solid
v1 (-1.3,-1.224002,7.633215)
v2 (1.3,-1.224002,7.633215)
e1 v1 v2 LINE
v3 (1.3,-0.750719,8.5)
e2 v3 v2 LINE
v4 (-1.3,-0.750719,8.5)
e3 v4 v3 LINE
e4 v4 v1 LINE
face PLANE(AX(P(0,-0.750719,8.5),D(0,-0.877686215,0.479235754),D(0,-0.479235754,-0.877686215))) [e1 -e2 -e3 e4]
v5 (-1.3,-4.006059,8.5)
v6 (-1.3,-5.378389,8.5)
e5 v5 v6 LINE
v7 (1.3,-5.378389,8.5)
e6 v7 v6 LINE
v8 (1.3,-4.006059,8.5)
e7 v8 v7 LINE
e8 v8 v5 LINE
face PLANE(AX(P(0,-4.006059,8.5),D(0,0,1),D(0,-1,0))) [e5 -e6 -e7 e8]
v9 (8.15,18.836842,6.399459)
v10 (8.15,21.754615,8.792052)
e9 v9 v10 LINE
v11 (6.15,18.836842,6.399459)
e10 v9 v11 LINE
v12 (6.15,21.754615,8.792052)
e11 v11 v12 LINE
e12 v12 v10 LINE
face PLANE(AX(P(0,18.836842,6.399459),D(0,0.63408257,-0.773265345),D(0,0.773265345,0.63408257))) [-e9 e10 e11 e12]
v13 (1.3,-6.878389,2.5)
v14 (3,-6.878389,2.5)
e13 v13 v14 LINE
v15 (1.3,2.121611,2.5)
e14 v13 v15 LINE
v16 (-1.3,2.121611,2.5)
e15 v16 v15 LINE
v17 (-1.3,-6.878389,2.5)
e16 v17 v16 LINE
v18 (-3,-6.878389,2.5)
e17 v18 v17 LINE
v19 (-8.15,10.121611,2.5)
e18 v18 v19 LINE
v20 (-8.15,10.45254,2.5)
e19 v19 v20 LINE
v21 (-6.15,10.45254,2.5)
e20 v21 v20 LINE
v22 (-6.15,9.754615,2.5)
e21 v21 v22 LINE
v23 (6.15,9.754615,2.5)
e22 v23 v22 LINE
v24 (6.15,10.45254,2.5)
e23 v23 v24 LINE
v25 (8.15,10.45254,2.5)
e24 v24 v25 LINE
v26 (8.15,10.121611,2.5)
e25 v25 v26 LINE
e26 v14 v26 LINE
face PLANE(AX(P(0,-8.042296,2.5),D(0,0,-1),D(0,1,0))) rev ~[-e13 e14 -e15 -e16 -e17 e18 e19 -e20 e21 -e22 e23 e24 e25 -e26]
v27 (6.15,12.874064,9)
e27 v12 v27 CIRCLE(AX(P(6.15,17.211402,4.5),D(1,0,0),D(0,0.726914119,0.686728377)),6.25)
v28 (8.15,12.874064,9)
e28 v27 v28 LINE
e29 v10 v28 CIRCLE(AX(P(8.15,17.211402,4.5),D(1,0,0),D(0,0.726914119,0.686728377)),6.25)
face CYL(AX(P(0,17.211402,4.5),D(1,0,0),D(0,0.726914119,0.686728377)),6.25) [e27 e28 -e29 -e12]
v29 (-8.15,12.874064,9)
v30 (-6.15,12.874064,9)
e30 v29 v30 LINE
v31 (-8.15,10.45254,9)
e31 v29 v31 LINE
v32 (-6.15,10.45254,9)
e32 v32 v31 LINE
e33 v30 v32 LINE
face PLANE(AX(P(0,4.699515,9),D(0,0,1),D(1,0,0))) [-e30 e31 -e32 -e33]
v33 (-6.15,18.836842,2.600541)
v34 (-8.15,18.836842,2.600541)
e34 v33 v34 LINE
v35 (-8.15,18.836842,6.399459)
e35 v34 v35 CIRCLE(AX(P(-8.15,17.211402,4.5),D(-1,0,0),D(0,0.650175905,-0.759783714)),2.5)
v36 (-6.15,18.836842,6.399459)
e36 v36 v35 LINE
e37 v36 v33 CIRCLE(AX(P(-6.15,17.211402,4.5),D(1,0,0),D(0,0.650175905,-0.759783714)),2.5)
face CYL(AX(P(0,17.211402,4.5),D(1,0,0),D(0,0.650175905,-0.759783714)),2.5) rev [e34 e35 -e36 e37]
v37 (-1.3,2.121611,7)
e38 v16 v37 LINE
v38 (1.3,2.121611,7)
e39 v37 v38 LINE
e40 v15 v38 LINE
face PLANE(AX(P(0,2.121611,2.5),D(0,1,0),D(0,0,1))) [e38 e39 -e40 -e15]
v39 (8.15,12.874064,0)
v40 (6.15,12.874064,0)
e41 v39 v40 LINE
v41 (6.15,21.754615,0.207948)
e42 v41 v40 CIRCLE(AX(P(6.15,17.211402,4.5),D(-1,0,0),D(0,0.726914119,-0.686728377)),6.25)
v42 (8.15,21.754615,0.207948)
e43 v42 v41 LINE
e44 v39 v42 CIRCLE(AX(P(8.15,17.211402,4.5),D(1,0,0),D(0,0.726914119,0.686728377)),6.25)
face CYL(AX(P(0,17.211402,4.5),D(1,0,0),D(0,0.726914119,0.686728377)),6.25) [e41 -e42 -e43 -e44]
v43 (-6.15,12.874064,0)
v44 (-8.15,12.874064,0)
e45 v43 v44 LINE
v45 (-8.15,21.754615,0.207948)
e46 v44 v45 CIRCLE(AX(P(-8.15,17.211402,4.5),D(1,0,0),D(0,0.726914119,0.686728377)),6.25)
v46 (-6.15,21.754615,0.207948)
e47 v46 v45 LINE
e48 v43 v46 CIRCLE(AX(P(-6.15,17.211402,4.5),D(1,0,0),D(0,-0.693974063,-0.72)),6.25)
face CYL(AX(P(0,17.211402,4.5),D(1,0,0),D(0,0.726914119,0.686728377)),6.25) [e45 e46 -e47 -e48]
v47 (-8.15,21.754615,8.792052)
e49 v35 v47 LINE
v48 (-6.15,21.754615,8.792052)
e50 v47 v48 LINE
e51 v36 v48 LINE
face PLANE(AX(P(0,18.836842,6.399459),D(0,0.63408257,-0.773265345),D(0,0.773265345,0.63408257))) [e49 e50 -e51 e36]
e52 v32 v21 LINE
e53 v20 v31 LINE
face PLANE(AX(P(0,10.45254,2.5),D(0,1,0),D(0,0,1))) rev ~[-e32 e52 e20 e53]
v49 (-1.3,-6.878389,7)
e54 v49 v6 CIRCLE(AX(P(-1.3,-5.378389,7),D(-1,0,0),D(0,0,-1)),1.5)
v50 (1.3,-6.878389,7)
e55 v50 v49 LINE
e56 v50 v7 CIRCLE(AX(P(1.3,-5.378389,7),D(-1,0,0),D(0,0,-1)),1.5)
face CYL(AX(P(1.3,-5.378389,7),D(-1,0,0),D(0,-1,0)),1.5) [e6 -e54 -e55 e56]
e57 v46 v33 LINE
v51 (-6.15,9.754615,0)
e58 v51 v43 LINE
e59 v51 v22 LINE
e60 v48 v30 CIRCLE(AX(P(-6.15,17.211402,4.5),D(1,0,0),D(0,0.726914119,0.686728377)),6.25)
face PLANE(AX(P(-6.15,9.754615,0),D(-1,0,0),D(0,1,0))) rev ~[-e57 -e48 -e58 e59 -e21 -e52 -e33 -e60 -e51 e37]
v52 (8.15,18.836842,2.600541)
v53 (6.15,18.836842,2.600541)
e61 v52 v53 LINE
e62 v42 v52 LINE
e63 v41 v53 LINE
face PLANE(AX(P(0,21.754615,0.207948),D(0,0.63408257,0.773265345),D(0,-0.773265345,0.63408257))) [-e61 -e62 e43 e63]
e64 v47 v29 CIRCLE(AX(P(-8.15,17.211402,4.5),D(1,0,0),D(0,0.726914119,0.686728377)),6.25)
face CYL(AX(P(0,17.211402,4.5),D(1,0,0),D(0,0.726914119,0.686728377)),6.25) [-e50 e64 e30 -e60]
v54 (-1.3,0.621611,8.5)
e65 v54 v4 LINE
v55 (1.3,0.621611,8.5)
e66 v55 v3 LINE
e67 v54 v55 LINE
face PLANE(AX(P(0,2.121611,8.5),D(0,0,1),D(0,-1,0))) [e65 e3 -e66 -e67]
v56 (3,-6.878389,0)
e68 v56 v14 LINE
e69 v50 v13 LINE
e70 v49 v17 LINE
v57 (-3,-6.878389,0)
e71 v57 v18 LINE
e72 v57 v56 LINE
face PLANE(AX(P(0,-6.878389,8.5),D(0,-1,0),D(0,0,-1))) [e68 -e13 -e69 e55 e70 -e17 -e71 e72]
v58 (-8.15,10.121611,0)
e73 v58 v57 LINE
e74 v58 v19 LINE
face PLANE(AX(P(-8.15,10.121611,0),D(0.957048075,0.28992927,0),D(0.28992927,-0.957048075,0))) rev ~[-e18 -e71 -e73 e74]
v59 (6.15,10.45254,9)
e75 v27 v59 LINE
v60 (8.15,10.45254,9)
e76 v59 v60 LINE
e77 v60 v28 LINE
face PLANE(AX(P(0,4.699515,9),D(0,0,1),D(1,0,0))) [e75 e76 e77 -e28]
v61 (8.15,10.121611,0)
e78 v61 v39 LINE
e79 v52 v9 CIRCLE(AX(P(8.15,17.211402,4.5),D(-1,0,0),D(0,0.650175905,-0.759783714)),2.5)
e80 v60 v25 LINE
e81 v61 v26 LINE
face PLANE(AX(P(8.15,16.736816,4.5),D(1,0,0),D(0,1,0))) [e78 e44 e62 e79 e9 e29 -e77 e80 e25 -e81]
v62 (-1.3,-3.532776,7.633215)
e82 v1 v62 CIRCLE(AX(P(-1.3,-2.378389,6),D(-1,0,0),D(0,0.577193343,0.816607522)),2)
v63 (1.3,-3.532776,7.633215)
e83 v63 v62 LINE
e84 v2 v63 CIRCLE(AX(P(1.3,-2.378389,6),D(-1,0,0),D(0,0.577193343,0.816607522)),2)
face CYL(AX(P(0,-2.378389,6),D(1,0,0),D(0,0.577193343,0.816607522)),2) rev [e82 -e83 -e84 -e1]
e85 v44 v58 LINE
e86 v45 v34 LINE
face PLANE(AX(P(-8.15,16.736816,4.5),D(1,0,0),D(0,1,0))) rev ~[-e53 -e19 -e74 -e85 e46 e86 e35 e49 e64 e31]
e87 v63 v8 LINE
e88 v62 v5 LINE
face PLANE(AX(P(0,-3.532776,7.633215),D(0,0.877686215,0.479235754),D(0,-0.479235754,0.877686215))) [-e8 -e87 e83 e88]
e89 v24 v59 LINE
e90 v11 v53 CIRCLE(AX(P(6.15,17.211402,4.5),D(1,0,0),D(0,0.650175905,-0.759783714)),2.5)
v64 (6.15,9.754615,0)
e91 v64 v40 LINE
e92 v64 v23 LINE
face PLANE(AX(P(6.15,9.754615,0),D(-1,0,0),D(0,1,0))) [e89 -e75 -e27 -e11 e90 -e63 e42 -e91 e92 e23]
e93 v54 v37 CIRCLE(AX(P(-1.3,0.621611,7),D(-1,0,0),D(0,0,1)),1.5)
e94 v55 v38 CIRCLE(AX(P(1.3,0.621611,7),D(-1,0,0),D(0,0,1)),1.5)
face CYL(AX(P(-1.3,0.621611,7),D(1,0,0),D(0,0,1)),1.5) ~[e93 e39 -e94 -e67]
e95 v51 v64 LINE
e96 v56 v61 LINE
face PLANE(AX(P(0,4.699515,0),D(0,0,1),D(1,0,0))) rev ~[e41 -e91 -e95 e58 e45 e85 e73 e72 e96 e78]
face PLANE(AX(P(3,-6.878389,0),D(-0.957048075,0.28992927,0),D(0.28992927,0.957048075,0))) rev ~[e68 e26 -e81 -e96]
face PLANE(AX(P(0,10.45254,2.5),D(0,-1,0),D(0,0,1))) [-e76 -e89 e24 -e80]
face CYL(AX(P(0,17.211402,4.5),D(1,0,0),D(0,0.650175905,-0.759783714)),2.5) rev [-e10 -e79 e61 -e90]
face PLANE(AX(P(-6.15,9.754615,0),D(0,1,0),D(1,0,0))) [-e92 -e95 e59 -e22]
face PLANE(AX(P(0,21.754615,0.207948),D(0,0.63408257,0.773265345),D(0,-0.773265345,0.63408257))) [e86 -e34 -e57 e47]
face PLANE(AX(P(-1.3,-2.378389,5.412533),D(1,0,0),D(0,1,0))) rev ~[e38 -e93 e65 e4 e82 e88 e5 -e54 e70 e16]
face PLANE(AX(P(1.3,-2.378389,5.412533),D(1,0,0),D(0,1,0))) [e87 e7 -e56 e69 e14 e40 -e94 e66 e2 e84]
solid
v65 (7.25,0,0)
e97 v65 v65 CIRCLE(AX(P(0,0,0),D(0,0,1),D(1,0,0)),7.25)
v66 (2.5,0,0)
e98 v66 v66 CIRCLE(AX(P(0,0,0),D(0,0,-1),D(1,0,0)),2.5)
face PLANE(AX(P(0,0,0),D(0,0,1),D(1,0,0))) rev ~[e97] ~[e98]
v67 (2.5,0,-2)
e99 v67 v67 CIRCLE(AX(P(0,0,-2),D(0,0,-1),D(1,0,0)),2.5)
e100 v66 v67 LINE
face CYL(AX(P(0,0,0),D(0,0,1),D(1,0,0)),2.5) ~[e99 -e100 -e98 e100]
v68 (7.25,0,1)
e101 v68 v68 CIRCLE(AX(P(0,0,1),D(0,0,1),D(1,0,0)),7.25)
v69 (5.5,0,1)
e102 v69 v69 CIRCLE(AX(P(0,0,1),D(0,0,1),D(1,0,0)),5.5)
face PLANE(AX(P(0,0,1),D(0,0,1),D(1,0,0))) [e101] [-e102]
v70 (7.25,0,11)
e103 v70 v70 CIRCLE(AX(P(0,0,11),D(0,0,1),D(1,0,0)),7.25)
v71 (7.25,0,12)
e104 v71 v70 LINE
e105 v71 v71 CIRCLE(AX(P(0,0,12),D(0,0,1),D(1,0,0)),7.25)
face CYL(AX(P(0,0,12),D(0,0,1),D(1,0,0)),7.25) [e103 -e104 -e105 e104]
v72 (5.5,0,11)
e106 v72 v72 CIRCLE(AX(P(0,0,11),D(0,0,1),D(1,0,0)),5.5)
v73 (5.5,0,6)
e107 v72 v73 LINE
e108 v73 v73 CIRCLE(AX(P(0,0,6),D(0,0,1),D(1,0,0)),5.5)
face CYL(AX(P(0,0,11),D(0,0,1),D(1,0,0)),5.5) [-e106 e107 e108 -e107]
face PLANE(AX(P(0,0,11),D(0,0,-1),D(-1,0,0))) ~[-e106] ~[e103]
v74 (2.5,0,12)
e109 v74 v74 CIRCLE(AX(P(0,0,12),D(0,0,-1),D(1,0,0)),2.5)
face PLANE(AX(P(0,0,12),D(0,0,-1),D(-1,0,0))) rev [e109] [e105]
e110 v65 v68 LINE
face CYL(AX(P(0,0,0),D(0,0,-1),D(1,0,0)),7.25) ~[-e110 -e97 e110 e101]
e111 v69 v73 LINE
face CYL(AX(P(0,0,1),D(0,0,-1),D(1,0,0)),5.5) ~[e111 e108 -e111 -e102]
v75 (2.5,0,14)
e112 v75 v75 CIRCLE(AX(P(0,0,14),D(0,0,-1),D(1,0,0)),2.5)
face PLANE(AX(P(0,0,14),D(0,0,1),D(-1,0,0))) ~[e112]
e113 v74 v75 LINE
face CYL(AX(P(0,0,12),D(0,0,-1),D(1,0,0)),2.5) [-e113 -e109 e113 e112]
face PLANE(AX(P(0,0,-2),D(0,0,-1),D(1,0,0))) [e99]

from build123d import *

# Parameters (mm, degrees)
F0_R           = 7.25
F1_DEPTH       = 1
F2_R           = 5.5
F3_DEPTH       = 5
F4_R           = 2.5
F5_DEPTH       = 2
F8_DEPTH       = 9
F10_DEPTH      = 8.15
F10_DEPTH_BACK = 8.15
F11_W          = 12.3
F11_H          = 13.3198345661
F12_DEPTH      = 25
F12_DEPTH_BACK = 25
F13_W          = 18.4948361841
F13_H          = 7.169587491
F14_DEPTH      = 25
F14_DEPTH_BACK = 25
F16_DEPTH      = 1.3
F16_DEPTH_BACK = 1.3
F17_R          = 1.5


with BuildPart() as f1:
    # F0 (on Top) → F1 (new body)
    with BuildSketch(Plane.XY):
        Circle(F0_R)
    extrude(amount=F1_DEPTH)

    # F2 (on face) → F3 (join)
    with BuildSketch(Plane.XY.offset(1)):
        Circle(F2_R)
    extrude(amount=F3_DEPTH)

    # F4 (on face) → F5 (join)
    with BuildSketch(Plane(origin=(0, 0, 0), x_dir=(1, 0, 0), z_dir=(0, 0, -1))):
        Circle(F4_R)
    extrude(amount=F5_DEPTH)

    # F6: F1 across face


with BuildPart() as f1_1:
    add(f1.part)
    add(f1.part.mirror(Plane.XY.offset(6)))


with BuildPart() as f8:
    # F7 (on Top) → F8 (new body)
    with BuildSketch(Plane.XY):
        Polygon((8.15, 13.1216109544), (0, 13.1216109544), (-8.15, 13.1216109544), (-8.15, 10.1216109544), (-3, -6.8783890456), (0, -6.8783890456), (3, -6.8783890456), (8.15, 10.1216109544), align=None)
    extrude(amount=F8_DEPTH)

    # F9 (on Right) → F10 (join, two sides)
    with BuildSketch(Plane.YZ) as f10_sk:
        with BuildLine():
            Line((18.8368415974, 6.399459286), (21.7546150774, 8.792052357))
            ThreePointArc((21.7546150774, 8.792052357), (10.9614018351, 4.5), (21.7546150774, 0.207947643))
            Line((21.7546150774, 0.207947643), (18.8368415974, 2.600540714))
            ThreePointArc((18.8368415974, 2.600540714), (14.7114018351, 4.5), (18.8368415974, 6.399459286))
        make_face()
    extrude(amount=F10_DEPTH)
    extrude(f10_sk.sketch, amount=-F10_DEPTH_BACK)

    # F11 (on Top) → F12 (cut, two sides)
    with BuildSketch(Plane.XY) as f12_sk:
        with Locations((0, 16.4145323604)):
            Rectangle(F11_W, F11_H)
    extrude(amount=F12_DEPTH, mode=Mode.SUBTRACT)
    extrude(f12_sk.sketch, amount=-F12_DEPTH_BACK, mode=Mode.SUBTRACT)

    # F13 (on Right) → F14 (cut, two sides)
    with BuildSketch(Plane.YZ) as f14_sk:
        with Locations((1.2051223312, 6.0847937455)):
            Rectangle(F13_W, F13_H)
    extrude(amount=-F14_DEPTH, mode=Mode.SUBTRACT)
    extrude(f14_sk.sketch, amount=F14_DEPTH_BACK, mode=Mode.SUBTRACT)

    # F15 (on Right) → F16 (join, two sides)
    with BuildSketch(Plane.YZ) as f16_sk:
        with BuildLine():
            Line((-6.8783890456, 8.5), (-6.8783890456, 2.5))
            Line((-6.8783890456, 2.5), (2.1216109544, 2.5))
            Line((2.1216109544, 2.5), (2.1216109544, 8.5))
            Line((2.1216109544, 8.5), (-0.7507189293, 8.5))
            Line((-0.7507189293, 8.5), (-1.2240023592, 7.6332150435))
            ThreePointArc((-1.2240023592, 7.6332150435), (-2.3783890456, 4), (-3.532775732, 7.6332150435))
            Line((-3.532775732, 7.6332150435), (-4.0060591619, 8.5))
            Line((-4.0060591619, 8.5), (-6.8783890456, 8.5))
        make_face()
    extrude(amount=F16_DEPTH)
    extrude(f16_sk.sketch, amount=-F16_DEPTH_BACK)

    # F17
    f17_edges = [f8.edges().sort_by_distance(p)[0] for p in [
        (0, -6.878389, 8.5),
        (0, 2.121611, 8.5),
    ]]
    fillet(f17_edges, radius=F17_R)


solid = Compound([f1_1.part, f8.part])
